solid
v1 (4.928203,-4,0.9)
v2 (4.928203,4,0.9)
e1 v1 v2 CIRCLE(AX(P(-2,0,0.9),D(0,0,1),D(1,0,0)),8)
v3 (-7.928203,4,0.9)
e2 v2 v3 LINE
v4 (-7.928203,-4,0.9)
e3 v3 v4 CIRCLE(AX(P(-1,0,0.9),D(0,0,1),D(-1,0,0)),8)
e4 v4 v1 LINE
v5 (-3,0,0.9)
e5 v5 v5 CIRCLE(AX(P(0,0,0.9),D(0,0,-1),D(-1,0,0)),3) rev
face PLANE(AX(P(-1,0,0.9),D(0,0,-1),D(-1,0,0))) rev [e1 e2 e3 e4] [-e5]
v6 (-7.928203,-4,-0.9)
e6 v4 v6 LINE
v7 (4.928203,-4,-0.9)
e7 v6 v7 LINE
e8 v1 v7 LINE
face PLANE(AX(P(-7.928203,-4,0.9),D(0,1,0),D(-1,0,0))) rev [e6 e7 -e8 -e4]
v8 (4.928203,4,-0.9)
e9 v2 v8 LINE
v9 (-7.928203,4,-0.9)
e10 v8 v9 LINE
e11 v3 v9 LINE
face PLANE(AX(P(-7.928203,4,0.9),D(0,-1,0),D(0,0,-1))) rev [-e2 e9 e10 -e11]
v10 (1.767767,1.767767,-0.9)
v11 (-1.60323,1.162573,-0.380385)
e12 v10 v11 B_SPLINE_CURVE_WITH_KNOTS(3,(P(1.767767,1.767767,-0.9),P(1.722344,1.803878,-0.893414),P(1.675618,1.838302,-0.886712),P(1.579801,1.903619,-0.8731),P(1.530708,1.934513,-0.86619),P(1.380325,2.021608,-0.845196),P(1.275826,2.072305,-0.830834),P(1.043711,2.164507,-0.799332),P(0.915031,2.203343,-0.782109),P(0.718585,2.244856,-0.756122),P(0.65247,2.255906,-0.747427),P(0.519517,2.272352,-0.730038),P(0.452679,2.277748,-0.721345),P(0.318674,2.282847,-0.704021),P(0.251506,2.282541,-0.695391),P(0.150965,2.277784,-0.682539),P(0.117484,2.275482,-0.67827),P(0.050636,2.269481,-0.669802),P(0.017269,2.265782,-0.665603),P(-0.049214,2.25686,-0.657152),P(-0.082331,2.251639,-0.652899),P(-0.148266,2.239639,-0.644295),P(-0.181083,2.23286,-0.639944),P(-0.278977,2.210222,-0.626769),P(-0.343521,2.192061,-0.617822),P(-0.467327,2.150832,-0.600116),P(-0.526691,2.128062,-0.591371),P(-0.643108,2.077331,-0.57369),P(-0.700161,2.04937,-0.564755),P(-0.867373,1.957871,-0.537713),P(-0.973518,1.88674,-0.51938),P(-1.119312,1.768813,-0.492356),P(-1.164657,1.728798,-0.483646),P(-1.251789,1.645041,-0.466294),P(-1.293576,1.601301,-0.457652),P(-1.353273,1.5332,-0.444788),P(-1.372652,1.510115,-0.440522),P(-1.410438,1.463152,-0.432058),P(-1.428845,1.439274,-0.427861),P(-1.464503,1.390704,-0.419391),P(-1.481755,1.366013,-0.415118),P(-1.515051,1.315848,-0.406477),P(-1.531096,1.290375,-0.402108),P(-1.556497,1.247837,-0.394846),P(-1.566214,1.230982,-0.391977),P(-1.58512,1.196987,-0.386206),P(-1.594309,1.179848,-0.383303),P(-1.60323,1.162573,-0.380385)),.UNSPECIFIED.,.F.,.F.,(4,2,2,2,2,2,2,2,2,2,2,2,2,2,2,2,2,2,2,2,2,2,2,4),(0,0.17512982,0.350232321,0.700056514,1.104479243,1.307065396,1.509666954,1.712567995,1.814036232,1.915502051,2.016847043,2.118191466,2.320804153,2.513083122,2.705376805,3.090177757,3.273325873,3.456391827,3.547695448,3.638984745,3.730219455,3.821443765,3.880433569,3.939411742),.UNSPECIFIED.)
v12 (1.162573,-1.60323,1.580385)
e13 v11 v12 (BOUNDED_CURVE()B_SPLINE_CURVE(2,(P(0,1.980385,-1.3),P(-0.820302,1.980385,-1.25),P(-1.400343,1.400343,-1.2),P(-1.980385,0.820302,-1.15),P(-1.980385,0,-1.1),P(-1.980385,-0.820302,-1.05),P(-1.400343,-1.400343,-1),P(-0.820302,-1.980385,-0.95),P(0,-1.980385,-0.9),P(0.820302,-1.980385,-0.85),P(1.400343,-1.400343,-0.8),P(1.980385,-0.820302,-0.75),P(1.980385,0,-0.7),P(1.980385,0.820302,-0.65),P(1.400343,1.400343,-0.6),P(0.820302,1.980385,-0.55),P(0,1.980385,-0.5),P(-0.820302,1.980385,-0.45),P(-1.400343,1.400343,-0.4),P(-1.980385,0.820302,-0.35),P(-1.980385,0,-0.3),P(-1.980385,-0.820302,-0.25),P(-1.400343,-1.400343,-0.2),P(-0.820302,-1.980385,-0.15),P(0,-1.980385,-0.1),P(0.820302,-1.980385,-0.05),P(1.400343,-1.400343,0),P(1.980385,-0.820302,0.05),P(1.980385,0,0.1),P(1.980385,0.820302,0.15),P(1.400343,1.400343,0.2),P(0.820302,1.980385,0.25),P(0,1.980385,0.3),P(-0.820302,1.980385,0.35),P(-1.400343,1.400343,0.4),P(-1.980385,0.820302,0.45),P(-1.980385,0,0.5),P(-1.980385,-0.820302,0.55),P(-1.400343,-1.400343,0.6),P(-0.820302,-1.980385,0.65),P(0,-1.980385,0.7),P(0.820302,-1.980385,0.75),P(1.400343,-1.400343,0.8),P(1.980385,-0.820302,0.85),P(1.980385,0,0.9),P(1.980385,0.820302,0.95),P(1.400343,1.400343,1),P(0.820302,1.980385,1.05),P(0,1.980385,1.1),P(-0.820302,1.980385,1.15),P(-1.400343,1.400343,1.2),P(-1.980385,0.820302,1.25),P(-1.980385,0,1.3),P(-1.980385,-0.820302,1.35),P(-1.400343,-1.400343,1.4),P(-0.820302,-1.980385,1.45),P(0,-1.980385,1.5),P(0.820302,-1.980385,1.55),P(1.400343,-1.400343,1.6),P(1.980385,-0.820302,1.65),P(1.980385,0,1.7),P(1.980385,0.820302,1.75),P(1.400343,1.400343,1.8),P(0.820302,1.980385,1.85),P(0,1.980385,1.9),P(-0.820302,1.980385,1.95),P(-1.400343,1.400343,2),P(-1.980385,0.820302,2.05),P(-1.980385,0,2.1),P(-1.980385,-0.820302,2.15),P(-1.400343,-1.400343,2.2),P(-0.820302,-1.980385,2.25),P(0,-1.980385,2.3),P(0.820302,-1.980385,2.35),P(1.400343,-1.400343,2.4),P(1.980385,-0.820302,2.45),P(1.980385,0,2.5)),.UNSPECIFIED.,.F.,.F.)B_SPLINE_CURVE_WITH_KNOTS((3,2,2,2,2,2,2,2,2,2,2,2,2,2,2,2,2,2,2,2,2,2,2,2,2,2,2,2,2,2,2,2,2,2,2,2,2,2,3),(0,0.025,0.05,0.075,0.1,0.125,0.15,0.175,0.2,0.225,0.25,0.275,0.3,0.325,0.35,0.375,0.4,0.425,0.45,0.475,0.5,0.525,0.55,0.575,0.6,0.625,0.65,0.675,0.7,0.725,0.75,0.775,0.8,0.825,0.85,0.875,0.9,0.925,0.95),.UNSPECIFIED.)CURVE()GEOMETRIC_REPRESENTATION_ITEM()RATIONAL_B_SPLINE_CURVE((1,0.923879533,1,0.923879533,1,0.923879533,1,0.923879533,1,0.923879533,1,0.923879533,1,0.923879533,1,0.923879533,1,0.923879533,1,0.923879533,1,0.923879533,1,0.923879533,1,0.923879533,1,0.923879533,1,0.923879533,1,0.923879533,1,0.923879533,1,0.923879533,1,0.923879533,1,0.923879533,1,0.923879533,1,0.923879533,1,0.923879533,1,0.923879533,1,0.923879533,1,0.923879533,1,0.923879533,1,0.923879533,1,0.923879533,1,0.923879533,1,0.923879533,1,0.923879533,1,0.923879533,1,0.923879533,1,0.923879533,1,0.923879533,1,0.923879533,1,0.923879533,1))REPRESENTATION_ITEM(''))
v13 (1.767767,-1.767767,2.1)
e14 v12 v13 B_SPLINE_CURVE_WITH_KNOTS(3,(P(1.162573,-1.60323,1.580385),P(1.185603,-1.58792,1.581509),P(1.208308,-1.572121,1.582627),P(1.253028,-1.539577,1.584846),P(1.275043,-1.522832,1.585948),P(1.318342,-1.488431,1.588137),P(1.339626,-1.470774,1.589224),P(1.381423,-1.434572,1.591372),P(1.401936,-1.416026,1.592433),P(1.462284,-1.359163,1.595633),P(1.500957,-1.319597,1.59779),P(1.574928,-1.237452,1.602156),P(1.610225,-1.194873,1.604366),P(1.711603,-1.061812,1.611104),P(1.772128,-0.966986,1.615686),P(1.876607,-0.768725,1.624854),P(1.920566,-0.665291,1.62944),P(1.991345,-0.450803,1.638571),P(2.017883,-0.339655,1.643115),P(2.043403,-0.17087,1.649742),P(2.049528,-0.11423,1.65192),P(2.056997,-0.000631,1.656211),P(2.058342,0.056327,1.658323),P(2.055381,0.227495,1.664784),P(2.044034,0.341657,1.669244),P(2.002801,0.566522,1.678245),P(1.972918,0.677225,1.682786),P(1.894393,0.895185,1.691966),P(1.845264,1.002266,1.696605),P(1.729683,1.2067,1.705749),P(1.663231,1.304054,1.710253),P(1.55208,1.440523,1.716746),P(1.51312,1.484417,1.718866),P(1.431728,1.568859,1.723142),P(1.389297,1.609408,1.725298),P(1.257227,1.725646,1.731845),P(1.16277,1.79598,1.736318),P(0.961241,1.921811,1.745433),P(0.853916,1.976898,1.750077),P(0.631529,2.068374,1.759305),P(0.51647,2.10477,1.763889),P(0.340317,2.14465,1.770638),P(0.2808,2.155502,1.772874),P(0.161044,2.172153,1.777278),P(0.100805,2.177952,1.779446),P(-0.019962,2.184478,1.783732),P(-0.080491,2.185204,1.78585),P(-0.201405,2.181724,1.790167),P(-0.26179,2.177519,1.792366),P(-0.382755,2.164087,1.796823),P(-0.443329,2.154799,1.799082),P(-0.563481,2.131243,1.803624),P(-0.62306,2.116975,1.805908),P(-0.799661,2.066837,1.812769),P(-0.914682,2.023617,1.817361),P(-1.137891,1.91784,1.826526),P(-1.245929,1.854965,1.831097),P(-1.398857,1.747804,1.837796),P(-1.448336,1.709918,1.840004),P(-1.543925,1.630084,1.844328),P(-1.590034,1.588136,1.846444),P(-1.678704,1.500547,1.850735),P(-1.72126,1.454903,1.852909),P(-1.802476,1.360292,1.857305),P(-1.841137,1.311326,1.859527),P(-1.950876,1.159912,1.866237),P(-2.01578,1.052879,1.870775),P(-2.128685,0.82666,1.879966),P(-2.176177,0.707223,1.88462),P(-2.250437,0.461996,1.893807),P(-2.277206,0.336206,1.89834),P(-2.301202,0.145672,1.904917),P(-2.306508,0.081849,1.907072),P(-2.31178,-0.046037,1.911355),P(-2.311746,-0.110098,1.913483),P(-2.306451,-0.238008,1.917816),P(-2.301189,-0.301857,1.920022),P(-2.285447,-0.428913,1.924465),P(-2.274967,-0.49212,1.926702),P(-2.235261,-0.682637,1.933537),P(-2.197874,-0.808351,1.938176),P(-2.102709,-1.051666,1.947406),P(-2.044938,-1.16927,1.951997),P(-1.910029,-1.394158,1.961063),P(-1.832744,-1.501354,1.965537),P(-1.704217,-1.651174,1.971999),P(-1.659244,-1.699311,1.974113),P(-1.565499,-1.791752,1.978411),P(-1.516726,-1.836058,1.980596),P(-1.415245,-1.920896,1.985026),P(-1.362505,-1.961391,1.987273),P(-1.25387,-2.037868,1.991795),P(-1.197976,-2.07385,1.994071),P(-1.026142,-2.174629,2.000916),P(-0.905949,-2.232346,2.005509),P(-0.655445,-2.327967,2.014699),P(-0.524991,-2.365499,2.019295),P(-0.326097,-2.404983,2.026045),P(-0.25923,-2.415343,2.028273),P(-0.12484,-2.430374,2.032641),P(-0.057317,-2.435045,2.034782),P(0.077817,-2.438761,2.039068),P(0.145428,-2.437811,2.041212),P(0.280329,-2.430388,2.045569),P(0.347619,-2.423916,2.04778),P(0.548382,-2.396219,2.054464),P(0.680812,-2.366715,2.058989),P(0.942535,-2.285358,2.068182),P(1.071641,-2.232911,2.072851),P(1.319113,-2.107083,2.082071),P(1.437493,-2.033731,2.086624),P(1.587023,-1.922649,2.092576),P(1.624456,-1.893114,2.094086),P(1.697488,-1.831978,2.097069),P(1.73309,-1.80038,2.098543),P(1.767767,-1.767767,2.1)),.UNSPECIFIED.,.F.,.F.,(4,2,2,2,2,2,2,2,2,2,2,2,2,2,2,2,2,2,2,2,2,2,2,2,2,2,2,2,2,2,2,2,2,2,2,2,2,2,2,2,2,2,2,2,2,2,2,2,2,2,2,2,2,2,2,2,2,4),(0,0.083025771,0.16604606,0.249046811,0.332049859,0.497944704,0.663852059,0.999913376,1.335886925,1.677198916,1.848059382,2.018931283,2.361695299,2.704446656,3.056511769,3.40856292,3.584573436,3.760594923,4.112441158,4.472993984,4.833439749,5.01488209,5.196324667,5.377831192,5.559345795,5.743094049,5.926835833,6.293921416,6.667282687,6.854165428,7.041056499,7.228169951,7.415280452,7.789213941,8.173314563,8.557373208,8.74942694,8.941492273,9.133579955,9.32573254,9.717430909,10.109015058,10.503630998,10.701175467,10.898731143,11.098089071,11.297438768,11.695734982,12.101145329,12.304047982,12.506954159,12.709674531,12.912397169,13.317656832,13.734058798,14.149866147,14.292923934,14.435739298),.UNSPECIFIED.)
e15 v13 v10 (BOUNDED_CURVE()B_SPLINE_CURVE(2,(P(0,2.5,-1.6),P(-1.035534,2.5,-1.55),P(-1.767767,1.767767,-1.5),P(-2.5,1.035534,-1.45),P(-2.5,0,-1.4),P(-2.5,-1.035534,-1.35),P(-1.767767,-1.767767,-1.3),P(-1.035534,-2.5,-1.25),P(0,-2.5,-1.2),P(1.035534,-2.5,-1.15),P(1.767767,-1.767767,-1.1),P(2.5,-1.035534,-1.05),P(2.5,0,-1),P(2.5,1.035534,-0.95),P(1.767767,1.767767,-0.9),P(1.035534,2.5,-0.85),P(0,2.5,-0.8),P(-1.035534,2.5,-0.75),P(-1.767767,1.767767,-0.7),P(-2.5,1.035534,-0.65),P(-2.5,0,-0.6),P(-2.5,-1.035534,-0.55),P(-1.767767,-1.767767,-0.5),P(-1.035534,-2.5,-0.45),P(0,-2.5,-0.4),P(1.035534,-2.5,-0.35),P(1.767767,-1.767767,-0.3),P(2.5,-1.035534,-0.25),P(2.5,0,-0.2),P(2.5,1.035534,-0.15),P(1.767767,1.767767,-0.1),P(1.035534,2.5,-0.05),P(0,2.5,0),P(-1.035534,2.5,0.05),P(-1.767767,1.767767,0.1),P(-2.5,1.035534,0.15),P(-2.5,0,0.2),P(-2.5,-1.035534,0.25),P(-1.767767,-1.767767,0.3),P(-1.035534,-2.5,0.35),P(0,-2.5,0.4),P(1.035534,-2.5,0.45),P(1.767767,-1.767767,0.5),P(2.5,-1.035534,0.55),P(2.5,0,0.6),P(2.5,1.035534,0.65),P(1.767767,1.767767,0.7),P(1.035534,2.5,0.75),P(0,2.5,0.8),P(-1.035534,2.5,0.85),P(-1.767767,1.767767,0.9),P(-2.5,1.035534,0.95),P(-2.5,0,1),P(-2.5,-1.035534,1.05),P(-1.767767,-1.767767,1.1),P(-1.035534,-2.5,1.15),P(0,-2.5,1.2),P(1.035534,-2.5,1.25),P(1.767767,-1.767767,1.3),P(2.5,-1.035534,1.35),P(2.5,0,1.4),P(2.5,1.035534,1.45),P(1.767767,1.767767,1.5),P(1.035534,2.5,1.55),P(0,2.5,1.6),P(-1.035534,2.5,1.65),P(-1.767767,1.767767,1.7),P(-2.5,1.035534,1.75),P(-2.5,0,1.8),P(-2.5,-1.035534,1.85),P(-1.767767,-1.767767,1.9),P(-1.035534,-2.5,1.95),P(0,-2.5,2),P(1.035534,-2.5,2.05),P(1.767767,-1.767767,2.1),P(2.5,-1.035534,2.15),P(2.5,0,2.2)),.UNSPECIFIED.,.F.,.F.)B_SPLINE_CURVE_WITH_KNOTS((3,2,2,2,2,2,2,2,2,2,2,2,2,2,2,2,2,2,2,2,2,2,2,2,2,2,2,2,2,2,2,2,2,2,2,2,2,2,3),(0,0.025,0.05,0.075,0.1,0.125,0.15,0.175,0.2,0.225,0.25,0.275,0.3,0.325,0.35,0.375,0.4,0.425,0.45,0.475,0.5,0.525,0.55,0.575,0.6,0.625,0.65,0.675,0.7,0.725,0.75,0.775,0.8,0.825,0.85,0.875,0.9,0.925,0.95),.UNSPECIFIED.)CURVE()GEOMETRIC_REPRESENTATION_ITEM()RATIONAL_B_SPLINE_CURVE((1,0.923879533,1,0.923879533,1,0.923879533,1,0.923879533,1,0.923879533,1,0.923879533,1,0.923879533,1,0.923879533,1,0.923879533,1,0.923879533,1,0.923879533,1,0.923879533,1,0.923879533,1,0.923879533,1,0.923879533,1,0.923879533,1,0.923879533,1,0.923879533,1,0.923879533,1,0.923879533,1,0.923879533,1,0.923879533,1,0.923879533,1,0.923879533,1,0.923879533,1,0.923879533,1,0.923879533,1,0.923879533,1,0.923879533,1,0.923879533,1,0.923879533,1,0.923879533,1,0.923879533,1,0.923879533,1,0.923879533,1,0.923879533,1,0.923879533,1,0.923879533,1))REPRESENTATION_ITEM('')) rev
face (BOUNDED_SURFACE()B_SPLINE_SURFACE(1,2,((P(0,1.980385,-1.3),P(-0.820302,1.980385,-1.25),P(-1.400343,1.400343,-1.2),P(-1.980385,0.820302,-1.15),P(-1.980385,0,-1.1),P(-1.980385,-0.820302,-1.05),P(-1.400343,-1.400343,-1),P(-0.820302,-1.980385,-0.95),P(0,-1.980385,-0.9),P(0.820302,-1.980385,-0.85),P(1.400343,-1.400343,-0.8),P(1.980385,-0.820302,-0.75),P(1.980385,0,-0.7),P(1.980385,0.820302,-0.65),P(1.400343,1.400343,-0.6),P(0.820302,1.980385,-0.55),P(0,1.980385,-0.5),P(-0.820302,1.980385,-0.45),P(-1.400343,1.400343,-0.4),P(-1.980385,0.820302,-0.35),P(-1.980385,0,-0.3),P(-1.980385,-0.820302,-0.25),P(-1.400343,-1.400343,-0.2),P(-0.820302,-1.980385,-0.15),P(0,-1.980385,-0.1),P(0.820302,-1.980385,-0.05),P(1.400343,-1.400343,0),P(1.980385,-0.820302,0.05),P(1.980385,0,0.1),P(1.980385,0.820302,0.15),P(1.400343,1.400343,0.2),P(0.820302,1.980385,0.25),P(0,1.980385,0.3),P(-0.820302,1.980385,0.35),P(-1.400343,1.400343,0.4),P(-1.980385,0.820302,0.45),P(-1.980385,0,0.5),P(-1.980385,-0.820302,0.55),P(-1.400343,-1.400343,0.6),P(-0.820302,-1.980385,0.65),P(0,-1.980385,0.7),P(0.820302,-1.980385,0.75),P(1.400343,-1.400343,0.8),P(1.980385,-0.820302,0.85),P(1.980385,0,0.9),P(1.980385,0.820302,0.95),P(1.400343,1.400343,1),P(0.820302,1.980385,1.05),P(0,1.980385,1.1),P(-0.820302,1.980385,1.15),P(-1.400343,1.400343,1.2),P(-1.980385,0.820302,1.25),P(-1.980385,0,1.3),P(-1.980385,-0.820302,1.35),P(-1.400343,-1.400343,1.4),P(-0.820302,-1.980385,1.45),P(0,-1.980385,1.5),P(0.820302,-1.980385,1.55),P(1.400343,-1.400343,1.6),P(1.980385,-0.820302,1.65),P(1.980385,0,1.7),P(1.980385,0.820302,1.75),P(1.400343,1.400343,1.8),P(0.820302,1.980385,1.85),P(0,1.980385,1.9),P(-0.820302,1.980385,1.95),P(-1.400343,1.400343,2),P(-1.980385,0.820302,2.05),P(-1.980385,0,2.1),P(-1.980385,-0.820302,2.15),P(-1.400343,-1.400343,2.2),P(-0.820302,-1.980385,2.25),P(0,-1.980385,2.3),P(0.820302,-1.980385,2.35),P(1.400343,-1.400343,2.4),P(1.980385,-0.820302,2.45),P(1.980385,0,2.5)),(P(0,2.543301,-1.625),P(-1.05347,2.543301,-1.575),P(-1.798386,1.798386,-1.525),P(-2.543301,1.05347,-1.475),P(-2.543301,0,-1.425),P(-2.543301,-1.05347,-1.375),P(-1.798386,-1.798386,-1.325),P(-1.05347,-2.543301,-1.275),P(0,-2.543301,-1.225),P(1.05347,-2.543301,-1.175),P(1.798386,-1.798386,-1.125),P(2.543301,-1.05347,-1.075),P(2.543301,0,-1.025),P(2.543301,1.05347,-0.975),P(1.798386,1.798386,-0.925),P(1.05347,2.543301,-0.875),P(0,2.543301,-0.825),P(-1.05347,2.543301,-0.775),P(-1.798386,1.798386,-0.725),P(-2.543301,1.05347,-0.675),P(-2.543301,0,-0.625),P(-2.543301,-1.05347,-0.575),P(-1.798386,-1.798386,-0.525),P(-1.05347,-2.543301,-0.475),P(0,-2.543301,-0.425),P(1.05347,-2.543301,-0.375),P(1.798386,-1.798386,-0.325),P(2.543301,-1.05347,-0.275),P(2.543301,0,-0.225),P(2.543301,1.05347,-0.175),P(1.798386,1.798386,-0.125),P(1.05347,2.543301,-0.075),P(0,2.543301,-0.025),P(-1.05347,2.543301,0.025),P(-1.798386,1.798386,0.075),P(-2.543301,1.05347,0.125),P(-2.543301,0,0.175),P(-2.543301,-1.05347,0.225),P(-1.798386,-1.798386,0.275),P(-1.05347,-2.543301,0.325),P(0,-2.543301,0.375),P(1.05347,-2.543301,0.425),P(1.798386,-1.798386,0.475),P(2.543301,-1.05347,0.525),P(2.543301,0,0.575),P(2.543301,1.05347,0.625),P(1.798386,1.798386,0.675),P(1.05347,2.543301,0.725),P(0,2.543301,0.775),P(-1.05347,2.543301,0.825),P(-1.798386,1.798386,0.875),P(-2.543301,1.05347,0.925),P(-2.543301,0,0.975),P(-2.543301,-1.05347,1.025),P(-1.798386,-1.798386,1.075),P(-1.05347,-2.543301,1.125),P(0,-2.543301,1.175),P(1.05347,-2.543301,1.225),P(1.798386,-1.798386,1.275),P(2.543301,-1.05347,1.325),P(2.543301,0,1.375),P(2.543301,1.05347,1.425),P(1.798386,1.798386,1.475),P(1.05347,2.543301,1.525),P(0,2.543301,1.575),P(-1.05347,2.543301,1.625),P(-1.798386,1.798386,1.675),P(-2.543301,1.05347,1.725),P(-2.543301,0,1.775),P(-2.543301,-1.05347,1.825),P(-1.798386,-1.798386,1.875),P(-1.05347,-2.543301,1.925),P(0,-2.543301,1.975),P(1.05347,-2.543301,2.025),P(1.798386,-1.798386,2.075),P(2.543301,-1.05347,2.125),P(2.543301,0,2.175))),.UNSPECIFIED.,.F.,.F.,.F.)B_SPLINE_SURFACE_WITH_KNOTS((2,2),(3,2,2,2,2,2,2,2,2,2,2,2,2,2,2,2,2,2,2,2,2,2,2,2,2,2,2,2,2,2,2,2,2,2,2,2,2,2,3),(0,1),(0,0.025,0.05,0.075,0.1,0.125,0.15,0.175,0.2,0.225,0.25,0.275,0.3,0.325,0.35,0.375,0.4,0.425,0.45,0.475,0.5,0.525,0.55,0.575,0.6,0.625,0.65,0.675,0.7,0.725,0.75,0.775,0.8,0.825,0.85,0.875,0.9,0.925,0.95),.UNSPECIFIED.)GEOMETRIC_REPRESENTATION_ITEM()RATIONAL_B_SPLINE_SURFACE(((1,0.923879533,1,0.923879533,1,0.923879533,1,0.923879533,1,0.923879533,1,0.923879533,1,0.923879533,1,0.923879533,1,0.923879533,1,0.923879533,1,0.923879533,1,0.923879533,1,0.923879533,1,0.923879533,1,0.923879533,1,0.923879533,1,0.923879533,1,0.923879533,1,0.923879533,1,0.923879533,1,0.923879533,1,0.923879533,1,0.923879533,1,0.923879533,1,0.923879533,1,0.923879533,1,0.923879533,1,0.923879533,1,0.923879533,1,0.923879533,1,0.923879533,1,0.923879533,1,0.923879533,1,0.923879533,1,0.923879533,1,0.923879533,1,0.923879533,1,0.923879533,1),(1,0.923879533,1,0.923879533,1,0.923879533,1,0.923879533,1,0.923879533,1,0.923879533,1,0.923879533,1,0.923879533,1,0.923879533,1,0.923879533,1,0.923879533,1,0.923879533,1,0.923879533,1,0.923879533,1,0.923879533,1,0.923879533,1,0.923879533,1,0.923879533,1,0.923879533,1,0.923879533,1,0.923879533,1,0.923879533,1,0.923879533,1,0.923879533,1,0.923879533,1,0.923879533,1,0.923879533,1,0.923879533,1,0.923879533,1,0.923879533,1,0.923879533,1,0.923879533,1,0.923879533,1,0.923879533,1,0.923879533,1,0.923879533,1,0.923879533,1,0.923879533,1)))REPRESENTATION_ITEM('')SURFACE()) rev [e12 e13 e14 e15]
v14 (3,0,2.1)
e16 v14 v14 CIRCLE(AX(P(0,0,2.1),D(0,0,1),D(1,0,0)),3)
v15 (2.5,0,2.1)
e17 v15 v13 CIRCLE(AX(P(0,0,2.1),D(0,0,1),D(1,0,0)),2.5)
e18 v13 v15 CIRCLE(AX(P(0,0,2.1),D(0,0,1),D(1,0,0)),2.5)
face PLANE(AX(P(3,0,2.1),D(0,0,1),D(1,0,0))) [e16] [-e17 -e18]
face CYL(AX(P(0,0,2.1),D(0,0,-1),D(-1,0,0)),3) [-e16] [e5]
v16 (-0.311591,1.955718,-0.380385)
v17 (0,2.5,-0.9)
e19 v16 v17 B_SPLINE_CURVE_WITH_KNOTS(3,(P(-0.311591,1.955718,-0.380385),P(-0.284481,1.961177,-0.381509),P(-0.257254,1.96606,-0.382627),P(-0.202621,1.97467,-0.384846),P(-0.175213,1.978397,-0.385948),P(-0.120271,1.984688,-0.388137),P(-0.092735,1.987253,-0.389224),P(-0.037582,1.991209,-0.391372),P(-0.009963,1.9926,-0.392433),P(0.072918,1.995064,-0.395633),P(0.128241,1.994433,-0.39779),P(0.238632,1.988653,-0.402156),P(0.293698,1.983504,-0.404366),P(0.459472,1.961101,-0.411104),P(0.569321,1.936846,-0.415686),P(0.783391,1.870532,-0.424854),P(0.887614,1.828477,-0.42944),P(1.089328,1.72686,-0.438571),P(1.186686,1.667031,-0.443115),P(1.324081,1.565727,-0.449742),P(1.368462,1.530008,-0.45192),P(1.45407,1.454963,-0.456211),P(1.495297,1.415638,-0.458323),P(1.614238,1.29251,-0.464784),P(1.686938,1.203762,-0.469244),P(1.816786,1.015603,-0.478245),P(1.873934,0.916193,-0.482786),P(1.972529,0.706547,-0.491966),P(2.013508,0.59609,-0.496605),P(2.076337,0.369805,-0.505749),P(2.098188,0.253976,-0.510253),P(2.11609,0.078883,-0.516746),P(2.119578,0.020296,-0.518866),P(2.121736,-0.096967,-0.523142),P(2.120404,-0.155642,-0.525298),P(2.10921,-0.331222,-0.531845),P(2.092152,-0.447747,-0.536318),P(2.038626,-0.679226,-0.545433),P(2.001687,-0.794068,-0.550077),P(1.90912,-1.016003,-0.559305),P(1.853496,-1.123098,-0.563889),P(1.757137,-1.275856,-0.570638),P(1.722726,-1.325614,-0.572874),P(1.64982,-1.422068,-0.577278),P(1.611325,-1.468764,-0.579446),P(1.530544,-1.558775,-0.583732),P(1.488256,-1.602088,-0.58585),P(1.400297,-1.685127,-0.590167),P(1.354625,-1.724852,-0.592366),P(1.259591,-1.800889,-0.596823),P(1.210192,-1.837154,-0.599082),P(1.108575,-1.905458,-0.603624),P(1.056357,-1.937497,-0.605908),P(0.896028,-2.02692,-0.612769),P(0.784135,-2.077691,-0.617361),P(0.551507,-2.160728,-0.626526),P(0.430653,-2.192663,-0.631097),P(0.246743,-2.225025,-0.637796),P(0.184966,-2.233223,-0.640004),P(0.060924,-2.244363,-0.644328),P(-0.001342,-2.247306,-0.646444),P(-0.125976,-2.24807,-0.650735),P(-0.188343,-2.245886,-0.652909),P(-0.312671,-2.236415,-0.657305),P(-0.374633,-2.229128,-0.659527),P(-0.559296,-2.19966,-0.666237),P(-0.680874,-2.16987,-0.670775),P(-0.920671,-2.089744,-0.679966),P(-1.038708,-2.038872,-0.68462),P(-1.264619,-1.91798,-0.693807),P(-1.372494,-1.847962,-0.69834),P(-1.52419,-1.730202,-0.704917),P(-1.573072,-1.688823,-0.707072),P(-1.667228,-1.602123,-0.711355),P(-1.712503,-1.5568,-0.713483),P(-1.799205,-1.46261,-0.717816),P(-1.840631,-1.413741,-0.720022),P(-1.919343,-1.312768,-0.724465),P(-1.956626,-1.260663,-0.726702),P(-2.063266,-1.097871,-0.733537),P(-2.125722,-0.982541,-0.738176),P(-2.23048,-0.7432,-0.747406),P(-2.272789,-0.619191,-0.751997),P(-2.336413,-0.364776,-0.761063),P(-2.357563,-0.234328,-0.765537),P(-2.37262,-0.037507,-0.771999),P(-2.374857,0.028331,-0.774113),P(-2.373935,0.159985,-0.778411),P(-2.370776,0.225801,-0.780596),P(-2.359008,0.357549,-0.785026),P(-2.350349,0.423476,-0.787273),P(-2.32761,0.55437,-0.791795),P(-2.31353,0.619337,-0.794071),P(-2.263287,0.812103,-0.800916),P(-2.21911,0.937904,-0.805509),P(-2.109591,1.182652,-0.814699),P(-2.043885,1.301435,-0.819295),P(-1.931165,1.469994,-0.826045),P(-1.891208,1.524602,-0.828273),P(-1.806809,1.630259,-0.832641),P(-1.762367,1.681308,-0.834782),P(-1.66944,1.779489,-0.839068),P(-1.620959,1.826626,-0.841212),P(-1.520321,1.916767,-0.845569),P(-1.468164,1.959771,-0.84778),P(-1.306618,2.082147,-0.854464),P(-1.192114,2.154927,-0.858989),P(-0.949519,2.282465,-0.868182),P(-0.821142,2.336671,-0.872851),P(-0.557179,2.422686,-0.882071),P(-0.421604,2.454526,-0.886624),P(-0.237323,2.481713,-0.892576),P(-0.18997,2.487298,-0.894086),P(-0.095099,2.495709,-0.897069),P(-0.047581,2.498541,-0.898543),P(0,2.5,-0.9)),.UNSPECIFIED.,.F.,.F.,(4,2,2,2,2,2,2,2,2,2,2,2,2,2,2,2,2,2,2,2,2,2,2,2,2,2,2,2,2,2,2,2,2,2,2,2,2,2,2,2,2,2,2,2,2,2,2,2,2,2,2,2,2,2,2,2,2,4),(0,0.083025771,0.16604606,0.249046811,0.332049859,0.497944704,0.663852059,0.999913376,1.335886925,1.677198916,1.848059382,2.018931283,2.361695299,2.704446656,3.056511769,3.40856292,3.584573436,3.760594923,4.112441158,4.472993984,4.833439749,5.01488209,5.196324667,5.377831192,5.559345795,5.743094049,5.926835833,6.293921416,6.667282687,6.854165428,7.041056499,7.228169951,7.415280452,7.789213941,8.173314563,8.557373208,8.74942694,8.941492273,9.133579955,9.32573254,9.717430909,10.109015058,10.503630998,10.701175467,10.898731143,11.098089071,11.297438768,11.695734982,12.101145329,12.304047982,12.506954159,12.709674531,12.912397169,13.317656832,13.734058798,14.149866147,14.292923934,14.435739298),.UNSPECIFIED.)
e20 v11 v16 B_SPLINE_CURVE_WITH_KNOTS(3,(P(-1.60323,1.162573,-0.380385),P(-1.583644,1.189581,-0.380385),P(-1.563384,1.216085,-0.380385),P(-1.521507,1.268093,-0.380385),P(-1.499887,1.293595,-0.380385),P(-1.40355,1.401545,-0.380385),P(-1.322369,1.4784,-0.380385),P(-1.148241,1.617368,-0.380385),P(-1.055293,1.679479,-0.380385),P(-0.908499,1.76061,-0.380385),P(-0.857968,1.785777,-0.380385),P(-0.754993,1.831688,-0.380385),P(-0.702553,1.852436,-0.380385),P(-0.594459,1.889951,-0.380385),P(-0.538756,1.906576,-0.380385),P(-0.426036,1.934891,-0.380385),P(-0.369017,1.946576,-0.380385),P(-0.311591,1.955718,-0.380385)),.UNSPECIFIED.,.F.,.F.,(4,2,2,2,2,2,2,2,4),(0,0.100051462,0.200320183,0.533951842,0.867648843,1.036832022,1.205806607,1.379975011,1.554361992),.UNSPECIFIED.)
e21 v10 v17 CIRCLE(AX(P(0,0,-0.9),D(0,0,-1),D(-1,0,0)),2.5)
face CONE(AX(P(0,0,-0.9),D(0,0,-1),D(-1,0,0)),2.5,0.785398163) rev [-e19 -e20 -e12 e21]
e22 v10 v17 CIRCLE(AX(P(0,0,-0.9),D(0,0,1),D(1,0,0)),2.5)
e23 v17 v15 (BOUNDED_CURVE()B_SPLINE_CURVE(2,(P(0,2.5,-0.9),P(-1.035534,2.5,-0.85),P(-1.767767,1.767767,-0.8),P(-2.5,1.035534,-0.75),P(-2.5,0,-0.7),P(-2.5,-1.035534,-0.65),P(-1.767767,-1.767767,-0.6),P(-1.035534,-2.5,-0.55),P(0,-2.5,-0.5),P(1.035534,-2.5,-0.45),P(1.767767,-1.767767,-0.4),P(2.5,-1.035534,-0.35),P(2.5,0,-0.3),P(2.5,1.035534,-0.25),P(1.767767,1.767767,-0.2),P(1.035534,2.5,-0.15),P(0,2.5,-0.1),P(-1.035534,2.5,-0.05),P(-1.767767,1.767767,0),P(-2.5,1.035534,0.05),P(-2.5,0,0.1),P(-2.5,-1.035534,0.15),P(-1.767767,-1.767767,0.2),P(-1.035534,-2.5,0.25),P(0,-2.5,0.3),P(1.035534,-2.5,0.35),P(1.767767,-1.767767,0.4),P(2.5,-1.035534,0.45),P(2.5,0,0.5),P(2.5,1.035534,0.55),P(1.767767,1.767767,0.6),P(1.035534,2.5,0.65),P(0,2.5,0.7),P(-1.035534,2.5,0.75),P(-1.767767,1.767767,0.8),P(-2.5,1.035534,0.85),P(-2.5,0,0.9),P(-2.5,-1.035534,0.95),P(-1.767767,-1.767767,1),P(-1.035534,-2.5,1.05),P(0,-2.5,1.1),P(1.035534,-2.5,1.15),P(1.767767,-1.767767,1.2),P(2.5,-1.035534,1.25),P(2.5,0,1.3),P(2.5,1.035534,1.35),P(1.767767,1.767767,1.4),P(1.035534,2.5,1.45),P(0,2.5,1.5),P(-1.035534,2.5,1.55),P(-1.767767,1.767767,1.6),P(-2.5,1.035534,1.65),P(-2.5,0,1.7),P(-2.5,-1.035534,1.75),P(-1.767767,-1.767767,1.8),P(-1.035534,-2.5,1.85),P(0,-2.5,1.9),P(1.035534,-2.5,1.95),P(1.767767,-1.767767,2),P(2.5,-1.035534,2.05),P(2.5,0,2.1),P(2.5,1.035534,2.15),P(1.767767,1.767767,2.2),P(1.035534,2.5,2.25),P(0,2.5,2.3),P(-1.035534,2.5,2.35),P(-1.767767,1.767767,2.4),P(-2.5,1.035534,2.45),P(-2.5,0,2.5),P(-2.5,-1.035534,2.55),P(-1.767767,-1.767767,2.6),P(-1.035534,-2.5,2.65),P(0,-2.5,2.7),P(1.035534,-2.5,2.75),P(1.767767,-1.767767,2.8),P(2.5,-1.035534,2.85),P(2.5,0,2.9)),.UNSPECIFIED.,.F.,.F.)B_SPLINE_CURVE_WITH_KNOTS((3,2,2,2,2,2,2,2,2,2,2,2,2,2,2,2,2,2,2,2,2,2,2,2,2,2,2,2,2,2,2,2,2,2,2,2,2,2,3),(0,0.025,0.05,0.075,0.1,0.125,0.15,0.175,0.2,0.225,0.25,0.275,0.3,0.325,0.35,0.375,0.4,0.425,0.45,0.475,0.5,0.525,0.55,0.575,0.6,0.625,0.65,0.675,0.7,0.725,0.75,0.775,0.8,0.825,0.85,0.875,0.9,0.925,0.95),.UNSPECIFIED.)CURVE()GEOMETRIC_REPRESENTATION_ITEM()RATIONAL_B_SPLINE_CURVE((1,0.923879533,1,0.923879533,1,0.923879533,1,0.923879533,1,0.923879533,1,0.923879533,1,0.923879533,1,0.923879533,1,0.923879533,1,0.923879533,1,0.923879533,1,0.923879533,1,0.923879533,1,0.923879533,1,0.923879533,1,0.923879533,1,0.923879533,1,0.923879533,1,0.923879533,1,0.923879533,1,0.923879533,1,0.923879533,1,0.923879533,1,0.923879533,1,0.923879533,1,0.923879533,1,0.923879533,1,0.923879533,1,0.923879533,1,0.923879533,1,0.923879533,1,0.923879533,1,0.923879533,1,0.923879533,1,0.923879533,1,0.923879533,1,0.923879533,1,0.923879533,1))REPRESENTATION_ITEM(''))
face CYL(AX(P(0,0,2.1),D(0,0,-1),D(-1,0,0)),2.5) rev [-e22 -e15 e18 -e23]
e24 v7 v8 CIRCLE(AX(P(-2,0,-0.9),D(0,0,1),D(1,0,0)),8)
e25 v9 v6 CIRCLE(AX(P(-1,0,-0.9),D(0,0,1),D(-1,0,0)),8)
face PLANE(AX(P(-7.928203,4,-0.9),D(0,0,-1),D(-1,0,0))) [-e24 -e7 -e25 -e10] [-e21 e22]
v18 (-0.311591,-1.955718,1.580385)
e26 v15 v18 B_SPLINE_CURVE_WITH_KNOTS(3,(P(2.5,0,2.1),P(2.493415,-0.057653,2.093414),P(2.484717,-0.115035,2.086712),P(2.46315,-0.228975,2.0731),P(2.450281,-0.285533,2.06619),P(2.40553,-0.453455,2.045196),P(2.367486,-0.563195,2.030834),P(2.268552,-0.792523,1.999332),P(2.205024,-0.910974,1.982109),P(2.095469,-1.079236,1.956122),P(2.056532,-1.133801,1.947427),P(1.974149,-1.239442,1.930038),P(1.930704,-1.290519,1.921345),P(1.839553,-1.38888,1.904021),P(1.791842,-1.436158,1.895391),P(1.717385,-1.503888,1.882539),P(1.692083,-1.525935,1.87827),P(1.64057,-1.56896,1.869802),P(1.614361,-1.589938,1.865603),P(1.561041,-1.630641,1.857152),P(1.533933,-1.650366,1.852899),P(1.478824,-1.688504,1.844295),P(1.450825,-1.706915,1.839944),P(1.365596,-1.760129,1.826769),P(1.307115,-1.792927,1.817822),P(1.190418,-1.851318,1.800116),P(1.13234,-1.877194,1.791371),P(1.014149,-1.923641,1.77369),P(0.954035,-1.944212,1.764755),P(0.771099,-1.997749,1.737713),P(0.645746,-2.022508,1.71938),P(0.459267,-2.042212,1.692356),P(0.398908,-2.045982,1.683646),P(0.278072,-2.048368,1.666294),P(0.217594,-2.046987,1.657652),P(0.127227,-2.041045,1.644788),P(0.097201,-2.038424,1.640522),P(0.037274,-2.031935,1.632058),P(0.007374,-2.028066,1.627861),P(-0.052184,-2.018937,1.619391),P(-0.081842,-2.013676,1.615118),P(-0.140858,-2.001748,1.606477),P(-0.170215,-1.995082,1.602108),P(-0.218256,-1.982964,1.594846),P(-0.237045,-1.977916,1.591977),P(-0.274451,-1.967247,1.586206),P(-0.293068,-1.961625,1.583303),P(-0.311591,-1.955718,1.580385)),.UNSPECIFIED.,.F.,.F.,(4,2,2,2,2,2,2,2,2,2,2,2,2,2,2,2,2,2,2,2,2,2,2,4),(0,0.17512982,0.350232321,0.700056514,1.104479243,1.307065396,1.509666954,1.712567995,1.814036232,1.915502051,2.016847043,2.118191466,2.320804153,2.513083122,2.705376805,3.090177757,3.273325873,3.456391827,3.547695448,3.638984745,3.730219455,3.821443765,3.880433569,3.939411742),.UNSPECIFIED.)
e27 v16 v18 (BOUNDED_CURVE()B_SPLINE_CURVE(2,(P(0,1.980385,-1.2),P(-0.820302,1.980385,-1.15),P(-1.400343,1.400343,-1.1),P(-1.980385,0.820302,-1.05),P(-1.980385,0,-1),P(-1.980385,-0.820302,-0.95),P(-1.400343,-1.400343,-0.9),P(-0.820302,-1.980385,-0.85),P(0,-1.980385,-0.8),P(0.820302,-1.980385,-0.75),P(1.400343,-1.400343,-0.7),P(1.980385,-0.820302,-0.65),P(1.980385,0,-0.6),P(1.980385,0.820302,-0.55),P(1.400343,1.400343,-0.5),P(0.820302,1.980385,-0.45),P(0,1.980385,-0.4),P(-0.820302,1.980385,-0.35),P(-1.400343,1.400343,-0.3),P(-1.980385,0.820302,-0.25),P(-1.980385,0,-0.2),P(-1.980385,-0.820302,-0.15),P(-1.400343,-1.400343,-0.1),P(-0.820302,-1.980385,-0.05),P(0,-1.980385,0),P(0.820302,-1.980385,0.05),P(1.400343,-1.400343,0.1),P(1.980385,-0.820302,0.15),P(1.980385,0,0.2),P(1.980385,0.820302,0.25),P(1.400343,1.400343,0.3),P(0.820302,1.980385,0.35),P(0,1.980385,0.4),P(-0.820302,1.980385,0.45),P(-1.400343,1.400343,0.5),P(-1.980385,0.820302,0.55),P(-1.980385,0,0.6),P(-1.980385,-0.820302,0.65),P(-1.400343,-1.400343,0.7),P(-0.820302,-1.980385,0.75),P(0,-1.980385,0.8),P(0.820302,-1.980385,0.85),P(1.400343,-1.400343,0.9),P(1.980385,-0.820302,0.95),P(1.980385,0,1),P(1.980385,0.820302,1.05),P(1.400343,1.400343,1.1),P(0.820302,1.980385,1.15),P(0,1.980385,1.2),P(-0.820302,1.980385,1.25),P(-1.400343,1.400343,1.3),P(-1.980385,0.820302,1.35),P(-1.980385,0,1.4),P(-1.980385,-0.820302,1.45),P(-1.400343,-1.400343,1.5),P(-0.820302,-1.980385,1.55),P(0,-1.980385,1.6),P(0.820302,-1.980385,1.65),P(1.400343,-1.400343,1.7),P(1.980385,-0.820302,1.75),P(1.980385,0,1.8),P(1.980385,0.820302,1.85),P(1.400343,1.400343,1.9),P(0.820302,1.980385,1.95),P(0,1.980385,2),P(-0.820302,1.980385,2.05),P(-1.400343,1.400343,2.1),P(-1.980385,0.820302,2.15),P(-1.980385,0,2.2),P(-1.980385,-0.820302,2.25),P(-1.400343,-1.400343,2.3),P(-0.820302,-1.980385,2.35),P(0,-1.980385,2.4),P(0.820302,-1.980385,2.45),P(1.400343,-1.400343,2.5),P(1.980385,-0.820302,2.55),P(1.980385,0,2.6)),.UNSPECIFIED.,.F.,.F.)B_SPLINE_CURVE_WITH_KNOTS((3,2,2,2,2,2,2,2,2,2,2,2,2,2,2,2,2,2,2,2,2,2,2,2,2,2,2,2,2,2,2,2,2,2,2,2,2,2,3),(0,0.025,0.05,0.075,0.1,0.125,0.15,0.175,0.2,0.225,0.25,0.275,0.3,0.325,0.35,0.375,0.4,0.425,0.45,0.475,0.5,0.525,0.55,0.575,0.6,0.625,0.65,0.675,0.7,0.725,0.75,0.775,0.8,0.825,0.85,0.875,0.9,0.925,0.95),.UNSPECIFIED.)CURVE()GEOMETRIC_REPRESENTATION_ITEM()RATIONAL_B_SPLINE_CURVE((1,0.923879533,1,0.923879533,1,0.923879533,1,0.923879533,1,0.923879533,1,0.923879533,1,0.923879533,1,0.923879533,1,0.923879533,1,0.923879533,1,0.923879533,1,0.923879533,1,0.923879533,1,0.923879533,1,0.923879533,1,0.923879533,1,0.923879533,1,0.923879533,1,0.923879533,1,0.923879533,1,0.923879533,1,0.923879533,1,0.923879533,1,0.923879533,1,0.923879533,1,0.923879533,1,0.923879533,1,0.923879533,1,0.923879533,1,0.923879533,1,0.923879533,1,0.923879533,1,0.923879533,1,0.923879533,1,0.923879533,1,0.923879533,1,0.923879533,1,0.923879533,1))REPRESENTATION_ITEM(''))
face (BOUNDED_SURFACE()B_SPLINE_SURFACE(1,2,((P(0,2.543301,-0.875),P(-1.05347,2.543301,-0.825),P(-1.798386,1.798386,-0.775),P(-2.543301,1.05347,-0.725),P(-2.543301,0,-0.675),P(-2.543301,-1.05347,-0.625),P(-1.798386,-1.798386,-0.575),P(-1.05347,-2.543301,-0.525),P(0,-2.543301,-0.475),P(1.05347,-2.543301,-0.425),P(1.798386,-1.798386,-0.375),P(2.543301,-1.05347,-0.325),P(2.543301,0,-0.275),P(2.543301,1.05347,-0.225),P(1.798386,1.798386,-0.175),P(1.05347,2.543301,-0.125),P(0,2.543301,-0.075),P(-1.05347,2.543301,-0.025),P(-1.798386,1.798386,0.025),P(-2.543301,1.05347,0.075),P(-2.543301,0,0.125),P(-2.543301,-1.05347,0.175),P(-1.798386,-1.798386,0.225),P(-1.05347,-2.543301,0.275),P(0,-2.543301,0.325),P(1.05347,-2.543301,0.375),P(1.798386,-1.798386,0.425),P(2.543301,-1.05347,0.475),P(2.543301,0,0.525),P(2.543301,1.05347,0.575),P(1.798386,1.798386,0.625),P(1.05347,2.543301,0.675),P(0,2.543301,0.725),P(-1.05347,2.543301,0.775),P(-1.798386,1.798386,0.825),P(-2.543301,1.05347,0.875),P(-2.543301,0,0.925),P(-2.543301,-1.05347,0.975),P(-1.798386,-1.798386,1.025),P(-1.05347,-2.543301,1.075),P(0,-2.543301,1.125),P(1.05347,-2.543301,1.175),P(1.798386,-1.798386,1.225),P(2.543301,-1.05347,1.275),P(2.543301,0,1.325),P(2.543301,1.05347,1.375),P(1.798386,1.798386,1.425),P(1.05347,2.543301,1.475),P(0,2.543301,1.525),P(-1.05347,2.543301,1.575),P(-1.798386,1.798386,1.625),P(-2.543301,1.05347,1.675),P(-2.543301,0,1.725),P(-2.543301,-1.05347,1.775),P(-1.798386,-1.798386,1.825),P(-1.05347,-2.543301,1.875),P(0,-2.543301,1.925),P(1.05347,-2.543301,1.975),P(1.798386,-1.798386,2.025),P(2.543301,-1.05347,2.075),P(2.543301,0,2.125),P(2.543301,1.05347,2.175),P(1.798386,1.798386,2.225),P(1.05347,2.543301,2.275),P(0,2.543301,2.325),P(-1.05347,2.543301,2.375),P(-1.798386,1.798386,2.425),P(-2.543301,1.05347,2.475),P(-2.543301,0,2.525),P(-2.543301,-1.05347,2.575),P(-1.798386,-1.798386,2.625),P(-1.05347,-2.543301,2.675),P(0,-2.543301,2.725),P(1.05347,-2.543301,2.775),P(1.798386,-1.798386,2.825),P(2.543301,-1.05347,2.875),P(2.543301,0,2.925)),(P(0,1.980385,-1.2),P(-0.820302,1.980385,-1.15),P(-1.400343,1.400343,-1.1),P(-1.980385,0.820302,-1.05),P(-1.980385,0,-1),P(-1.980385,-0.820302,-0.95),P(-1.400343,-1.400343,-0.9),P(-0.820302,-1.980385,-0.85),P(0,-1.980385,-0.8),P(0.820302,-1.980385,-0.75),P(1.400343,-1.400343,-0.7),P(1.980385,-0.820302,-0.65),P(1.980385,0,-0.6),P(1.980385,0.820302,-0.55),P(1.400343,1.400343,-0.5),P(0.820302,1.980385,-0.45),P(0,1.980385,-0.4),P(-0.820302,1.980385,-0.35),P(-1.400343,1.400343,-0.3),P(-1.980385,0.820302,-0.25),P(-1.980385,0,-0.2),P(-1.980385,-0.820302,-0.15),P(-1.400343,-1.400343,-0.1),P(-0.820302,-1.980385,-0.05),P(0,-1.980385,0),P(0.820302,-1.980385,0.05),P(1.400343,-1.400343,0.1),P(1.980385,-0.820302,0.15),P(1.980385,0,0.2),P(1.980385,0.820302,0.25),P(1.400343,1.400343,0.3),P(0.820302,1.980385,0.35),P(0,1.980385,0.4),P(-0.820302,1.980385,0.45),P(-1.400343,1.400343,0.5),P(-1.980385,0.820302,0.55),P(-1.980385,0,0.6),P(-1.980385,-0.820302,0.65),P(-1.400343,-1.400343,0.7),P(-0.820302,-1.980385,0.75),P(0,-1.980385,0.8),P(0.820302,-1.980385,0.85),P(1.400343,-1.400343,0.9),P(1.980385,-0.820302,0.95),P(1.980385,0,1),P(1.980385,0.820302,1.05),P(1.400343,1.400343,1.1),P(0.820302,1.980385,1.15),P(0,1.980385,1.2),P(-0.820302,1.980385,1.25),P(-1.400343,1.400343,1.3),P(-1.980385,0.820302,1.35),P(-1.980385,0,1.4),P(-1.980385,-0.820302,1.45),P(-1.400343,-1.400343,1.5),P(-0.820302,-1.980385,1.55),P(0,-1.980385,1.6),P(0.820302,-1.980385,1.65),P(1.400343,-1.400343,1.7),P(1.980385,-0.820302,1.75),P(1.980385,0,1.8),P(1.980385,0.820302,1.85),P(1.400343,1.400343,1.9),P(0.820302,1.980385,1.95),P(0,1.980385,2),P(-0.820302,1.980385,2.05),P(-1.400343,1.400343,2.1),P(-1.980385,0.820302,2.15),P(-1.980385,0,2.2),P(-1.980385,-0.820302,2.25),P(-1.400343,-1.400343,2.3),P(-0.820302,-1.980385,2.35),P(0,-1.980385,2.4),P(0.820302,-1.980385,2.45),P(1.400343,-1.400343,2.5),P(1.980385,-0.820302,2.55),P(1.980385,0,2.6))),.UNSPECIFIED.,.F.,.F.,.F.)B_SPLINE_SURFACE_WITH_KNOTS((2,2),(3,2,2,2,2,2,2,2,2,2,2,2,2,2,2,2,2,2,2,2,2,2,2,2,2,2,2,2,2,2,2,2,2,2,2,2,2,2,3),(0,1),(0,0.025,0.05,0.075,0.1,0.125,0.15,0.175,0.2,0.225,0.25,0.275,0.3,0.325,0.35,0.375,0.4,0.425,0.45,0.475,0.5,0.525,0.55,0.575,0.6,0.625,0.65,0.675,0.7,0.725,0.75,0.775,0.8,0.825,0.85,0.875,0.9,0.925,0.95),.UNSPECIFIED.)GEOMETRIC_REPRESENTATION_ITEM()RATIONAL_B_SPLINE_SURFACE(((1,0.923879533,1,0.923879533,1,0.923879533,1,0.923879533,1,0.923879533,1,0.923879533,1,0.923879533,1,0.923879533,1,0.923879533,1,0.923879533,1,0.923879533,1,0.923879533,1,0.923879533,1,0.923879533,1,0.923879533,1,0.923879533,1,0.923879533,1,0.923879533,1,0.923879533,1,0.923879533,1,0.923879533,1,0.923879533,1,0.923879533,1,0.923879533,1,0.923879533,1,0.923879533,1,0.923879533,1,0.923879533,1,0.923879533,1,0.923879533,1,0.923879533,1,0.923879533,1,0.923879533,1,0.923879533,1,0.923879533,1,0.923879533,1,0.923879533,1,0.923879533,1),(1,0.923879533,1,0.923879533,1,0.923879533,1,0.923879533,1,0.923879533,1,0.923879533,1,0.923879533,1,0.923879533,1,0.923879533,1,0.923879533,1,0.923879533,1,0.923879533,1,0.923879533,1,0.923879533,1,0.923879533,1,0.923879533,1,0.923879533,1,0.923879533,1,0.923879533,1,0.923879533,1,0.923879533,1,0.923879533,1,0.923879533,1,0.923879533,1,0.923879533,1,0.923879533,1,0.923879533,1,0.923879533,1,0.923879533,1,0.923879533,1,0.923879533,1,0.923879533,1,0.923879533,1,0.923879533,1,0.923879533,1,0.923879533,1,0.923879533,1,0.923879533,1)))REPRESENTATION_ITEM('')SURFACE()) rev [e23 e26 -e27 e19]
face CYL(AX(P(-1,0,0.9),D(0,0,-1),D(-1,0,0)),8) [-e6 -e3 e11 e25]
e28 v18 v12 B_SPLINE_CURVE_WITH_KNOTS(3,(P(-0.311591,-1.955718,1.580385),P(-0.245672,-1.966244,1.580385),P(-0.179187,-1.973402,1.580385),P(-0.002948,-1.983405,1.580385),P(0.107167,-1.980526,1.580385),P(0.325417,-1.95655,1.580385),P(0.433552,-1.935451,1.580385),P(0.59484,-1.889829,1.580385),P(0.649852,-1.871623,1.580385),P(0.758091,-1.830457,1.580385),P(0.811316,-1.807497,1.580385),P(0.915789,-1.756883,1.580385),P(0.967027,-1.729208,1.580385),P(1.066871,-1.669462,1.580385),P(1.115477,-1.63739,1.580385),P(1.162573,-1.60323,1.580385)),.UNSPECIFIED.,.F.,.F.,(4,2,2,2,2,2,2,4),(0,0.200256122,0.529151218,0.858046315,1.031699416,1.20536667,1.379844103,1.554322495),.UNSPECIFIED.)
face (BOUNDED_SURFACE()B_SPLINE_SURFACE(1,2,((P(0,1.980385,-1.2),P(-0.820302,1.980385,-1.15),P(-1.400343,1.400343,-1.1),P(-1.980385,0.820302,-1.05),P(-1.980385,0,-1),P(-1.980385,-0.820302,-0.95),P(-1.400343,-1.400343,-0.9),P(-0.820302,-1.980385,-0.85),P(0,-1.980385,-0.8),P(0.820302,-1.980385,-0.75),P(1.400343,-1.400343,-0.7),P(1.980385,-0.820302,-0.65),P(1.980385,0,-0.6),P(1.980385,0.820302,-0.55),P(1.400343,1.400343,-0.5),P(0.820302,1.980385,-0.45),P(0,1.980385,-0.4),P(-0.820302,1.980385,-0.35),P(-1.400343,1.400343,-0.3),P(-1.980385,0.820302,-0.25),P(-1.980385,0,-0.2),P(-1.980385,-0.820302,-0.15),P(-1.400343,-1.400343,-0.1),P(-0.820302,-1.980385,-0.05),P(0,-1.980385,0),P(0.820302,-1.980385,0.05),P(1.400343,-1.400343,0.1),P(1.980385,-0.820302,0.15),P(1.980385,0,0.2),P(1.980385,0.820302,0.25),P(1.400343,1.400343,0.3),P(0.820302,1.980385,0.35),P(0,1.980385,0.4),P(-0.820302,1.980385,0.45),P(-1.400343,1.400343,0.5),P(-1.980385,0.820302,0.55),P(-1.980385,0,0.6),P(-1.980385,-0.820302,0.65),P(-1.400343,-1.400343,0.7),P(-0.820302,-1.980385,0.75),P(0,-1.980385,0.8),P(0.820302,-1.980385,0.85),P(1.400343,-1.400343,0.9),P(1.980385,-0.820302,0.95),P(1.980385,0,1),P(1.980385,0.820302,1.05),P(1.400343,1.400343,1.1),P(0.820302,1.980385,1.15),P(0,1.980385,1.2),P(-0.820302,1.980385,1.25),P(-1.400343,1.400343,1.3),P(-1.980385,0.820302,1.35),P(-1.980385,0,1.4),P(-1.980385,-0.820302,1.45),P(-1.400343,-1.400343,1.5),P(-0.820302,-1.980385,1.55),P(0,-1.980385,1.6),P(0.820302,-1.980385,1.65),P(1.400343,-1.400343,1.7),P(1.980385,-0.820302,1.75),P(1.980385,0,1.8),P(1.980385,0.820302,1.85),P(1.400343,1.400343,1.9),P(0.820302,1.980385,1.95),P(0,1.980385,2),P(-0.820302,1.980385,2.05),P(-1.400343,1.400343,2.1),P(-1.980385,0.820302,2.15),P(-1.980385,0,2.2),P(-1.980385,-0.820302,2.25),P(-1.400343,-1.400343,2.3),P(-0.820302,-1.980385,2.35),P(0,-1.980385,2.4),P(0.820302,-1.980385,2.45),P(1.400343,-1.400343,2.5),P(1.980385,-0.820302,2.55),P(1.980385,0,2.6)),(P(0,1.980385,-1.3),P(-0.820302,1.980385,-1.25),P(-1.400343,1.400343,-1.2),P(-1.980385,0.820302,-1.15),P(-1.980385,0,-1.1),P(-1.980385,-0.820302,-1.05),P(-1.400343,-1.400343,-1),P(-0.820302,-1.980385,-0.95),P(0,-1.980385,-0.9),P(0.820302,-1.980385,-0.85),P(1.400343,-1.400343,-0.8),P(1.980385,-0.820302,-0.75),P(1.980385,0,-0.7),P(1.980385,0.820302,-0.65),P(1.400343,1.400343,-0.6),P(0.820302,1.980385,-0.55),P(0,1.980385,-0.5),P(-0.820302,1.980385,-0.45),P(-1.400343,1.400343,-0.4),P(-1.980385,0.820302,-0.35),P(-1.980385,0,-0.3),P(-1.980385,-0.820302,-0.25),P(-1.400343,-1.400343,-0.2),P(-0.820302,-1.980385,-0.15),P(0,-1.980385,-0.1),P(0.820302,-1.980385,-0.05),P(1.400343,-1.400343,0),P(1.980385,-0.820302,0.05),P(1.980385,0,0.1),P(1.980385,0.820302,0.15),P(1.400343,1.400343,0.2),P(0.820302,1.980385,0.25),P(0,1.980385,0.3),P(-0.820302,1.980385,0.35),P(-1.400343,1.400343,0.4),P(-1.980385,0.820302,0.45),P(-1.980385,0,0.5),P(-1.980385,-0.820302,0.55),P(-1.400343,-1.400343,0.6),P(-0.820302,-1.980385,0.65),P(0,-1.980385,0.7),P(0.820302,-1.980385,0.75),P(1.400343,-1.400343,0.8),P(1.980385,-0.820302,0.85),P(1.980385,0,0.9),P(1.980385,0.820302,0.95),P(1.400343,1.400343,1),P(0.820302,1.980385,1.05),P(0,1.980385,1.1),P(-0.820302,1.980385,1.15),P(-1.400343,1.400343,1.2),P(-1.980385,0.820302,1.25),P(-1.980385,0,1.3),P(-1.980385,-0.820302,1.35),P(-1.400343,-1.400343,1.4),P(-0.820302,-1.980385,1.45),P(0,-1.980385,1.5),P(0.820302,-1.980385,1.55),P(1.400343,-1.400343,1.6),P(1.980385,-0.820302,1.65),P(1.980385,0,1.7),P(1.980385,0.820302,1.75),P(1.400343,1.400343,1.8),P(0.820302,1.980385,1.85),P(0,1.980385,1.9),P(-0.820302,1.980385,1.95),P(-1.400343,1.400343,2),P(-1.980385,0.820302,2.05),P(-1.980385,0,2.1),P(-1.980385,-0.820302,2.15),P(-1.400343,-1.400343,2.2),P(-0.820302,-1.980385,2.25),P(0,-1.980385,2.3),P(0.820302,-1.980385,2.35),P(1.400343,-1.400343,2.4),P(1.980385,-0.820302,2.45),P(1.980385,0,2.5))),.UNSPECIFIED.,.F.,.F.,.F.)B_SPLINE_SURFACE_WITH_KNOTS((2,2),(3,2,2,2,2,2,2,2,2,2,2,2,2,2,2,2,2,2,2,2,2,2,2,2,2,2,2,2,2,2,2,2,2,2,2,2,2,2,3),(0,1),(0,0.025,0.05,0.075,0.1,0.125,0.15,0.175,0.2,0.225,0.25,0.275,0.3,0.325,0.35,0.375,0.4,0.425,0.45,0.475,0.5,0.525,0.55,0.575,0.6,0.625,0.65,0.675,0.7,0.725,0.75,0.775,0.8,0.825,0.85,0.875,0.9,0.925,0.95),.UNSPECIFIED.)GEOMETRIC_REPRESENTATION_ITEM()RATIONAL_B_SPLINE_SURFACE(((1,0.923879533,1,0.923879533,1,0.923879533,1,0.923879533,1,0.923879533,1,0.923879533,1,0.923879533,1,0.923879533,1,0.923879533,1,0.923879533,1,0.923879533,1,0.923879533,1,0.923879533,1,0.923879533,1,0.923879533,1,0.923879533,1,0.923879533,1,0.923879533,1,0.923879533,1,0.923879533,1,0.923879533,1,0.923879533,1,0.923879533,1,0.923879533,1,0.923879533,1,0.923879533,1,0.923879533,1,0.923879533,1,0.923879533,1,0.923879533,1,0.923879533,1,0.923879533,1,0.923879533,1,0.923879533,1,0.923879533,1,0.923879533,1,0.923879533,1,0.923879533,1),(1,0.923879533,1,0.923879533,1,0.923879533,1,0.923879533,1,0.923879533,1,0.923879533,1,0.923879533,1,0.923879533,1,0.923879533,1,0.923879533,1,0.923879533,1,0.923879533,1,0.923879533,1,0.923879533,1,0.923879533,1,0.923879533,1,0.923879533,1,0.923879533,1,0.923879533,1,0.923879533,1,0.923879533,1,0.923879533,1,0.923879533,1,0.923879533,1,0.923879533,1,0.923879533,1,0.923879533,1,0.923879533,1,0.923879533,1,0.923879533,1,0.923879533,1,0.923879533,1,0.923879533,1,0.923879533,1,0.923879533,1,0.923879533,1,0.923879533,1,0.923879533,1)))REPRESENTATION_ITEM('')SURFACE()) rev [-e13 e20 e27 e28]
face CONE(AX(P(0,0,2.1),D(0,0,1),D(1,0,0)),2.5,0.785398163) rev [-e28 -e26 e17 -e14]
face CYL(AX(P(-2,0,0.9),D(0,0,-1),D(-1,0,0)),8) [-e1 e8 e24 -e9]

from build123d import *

# Parameters (mm, degrees)
BOSS_EXTRUDE1_DEPTH     = 0.9
SKETCH8_R               = 3
SKETCH8_R_2             = 2.5
BOSS_EXTRUDE2_DEPTH     = 1.2
CUT_EXTRUDE1_DEPTH      = 11.070253224
CUT_EXTRUDE1_DEPTH_BACK = 11.070253224
SKETCH1_R               = 2.5
SWEEP1_PITCH            = 0.8
SPLIT1_START            = -3.0000001
SPLIT1_OUTLINE_W        = 8
SPLIT1_OUTLINE_H        = 2.1
SPLIT1_OUTLINE_H_2      = 1.9
SPLIT1_DEPTH            = 6.0000002


with BuildPart() as part:
    # Sketch7 → Boss-Extrude1 (new, symmetric)
    with BuildSketch(Plane.XY):
        with BuildLine():
            Line((-7.92820323, 4), (4.92820323, 4))
            ThreePointArc((4.92820323, 4), (6, 0), (4.92820323, -4))
            Line((4.92820323, -4), (-7.92820323, -4))
            ThreePointArc((-7.92820323, -4), (-9, 0), (-7.92820323, 4))
        make_face()
    extrude(amount=BOSS_EXTRUDE1_DEPTH, both=True)

    # Sketch8 → Boss-Extrude2 (add)
    with BuildSketch(Plane.XY.offset(0.9)):
        with Locations(Location((0, 0, 0), (0, 0, 180))):
            Circle(SKETCH8_R)
        Circle(SKETCH8_R_2, mode=Mode.SUBTRACT)
    extrude(amount=BOSS_EXTRUDE2_DEPTH)

    # Sketch1 → Cut-Extrude1 (cut, two sides: drawn at the far end of the back side and taken through both)
    with BuildSketch(Plane.XY.offset(-CUT_EXTRUDE1_DEPTH_BACK)):
        Circle(SKETCH1_R)
    extrude(amount=CUT_EXTRUDE1_DEPTH + CUT_EXTRUDE1_DEPTH_BACK, mode=Mode.SUBTRACT)

    # Sweep1: arcs per turn and ends read off the stored shape
    # Sweep1: the profile of Sketch3 screwed along a right-hand helix through 4.75 turns, 8 arcs to a turn; built about Z, then put on its axis
    sweep1_z = Axis((0, 0, 0), (0, 0, 1))
    sweep1_corners = [(2.54330127, 0, 0.025), (2.54330127, 0, -0.725), (1.980384758, 0, -0.4), (1.980384758, 0, -0.3)]
    with BuildLine(mode=Mode.PRIVATE) as sweep1_profile:
        Line(sweep1_corners[0], sweep1_corners[1])
        Line(sweep1_corners[1], sweep1_corners[2])
        Line(sweep1_corners[2], sweep1_corners[3])
        Line(sweep1_corners[3], sweep1_corners[0])
    sweep1_cap = Face(sweep1_profile.wire())
    sweep1_turn_angles = [0, 22.5, 45, 67.5, 90, 112.5, 135, 157.5, 180, 202.5, 225, 247.5, 270, 292.5, 315, 337.5, 360]
    sweep1_turn_weights = [1, 0.9238795325112867, 1, 0.9238795325112867, 1, 0.9238795325112867, 1, 0.9238795325112867, 1, 0.9238795325112867, 1, 0.9238795325112867, 1, 0.9238795325112867, 1, 0.9238795325112867, 1]
    sweep1_turn_rails = [Edge.make_bspline([Vector(p[0], p[1], 0).rotate(sweep1_z, sweep1_turn_angles[k]) / sweep1_turn_weights[k] + Vector(0, 0, p[2] + SWEEP1_PITCH * sweep1_turn_angles[k] / 360) for k in range(17)], [0, 0, 0, 1, 1, 2, 2, 3, 3, 4, 4, 5, 5, 6, 6, 7, 7, 8, 8, 8], 2, sweep1_turn_weights) for p in sweep1_corners]
    sweep1_turn_sides = [Face.make_surface_from_curves(sweep1_turn_rails[p[0]], sweep1_turn_rails[p[1]]) for p in [(0, 1), (1, 2), (2, 3), (3, 0)]]
    sweep1_last_angles = [1440, 1462.5, 1485, 1507.5, 1530, 1552.5, 1575, 1597.5, 1620, 1642.5, 1665, 1687.5, 1710]
    sweep1_last_weights = [1, 0.9238795325112867, 1, 0.9238795325112867, 1, 0.9238795325112867, 1, 0.9238795325112867, 1, 0.9238795325112867, 1, 0.9238795325112776, 1]
    sweep1_last_rails = [Edge.make_bspline([Vector(p[0], p[1], 0).rotate(sweep1_z, sweep1_last_angles[k]) / sweep1_last_weights[k] + Vector(0, 0, p[2] + SWEEP1_PITCH * sweep1_last_angles[k] / 360) for k in range(13)], [0, 0, 0, 1, 1, 2, 2, 3, 3, 4, 4, 5, 5, 6, 6, 6], 2, sweep1_last_weights) for p in sweep1_corners]
    sweep1_last_sides = [Face.make_surface_from_curves(sweep1_last_rails[p[0]], sweep1_last_rails[p[1]]) for p in [(0, 1), (1, 2), (2, 3), (3, 0)]]
    sweep1 = Plane(origin=(0, 0, -0.9), x_dir=(0, 1, 0), z_dir=(0, 0, 1)) * Solid(Shell([*[p.moved(Location((0, 0, SWEEP1_PITCH * i))) for i in range(4) for p in sweep1_turn_sides], *sweep1_last_sides, sweep1_cap, sweep1_cap.rotate(sweep1_z, 1710).moved(Location((0, 0, SWEEP1_PITCH * 1710 / 360)))]))
    add(sweep1)

    # Split1: read off the stored shape, not the designer's step
    # Split1 outline → Split1 (cut)
    with BuildSketch(Plane(origin=(0, 0, 0), x_dir=(1, 0, 0), z_dir=(0, 1, 0)).offset(SPLIT1_START)):
        with Locations((0, 1.95)):
            Rectangle(SPLIT1_OUTLINE_W, SPLIT1_OUTLINE_H)
        with Locations((0, -3.05)):
            Rectangle(SPLIT1_OUTLINE_W, SPLIT1_OUTLINE_H_2)
    extrude(amount=SPLIT1_DEPTH, mode=Mode.SUBTRACT)

    # Cut-Extrude2 cone 1 section (through the dimple's axis) → Cut-Extrude2 (revolve, cut)
    with BuildSketch(Plane(origin=(0, 0, -0.9), x_dir=(0, 1, 0), z_dir=(1, 0, 0))):
        Polygon((0, 0), (2.5, 0), (0, 2.5), align=None)
    revolve(axis=Axis((0, 0, -0.9), (0, 0, 1)), mode=Mode.SUBTRACT)

    # Cut-Extrude3 cone 1 section (through the dimple's axis) → Cut-Extrude3 (revolve, cut)
    with BuildSketch(Plane(origin=(0, 0, 2.1), x_dir=(0, -1, 0), z_dir=(1, 0, 0))):
        Polygon((0, 0), (2.5, 0), (0, 2.5), align=None)
    revolve(axis=Axis((0, 0, 2.1), (0, 0, -1)), mode=Mode.SUBTRACT)


solid = part.part
